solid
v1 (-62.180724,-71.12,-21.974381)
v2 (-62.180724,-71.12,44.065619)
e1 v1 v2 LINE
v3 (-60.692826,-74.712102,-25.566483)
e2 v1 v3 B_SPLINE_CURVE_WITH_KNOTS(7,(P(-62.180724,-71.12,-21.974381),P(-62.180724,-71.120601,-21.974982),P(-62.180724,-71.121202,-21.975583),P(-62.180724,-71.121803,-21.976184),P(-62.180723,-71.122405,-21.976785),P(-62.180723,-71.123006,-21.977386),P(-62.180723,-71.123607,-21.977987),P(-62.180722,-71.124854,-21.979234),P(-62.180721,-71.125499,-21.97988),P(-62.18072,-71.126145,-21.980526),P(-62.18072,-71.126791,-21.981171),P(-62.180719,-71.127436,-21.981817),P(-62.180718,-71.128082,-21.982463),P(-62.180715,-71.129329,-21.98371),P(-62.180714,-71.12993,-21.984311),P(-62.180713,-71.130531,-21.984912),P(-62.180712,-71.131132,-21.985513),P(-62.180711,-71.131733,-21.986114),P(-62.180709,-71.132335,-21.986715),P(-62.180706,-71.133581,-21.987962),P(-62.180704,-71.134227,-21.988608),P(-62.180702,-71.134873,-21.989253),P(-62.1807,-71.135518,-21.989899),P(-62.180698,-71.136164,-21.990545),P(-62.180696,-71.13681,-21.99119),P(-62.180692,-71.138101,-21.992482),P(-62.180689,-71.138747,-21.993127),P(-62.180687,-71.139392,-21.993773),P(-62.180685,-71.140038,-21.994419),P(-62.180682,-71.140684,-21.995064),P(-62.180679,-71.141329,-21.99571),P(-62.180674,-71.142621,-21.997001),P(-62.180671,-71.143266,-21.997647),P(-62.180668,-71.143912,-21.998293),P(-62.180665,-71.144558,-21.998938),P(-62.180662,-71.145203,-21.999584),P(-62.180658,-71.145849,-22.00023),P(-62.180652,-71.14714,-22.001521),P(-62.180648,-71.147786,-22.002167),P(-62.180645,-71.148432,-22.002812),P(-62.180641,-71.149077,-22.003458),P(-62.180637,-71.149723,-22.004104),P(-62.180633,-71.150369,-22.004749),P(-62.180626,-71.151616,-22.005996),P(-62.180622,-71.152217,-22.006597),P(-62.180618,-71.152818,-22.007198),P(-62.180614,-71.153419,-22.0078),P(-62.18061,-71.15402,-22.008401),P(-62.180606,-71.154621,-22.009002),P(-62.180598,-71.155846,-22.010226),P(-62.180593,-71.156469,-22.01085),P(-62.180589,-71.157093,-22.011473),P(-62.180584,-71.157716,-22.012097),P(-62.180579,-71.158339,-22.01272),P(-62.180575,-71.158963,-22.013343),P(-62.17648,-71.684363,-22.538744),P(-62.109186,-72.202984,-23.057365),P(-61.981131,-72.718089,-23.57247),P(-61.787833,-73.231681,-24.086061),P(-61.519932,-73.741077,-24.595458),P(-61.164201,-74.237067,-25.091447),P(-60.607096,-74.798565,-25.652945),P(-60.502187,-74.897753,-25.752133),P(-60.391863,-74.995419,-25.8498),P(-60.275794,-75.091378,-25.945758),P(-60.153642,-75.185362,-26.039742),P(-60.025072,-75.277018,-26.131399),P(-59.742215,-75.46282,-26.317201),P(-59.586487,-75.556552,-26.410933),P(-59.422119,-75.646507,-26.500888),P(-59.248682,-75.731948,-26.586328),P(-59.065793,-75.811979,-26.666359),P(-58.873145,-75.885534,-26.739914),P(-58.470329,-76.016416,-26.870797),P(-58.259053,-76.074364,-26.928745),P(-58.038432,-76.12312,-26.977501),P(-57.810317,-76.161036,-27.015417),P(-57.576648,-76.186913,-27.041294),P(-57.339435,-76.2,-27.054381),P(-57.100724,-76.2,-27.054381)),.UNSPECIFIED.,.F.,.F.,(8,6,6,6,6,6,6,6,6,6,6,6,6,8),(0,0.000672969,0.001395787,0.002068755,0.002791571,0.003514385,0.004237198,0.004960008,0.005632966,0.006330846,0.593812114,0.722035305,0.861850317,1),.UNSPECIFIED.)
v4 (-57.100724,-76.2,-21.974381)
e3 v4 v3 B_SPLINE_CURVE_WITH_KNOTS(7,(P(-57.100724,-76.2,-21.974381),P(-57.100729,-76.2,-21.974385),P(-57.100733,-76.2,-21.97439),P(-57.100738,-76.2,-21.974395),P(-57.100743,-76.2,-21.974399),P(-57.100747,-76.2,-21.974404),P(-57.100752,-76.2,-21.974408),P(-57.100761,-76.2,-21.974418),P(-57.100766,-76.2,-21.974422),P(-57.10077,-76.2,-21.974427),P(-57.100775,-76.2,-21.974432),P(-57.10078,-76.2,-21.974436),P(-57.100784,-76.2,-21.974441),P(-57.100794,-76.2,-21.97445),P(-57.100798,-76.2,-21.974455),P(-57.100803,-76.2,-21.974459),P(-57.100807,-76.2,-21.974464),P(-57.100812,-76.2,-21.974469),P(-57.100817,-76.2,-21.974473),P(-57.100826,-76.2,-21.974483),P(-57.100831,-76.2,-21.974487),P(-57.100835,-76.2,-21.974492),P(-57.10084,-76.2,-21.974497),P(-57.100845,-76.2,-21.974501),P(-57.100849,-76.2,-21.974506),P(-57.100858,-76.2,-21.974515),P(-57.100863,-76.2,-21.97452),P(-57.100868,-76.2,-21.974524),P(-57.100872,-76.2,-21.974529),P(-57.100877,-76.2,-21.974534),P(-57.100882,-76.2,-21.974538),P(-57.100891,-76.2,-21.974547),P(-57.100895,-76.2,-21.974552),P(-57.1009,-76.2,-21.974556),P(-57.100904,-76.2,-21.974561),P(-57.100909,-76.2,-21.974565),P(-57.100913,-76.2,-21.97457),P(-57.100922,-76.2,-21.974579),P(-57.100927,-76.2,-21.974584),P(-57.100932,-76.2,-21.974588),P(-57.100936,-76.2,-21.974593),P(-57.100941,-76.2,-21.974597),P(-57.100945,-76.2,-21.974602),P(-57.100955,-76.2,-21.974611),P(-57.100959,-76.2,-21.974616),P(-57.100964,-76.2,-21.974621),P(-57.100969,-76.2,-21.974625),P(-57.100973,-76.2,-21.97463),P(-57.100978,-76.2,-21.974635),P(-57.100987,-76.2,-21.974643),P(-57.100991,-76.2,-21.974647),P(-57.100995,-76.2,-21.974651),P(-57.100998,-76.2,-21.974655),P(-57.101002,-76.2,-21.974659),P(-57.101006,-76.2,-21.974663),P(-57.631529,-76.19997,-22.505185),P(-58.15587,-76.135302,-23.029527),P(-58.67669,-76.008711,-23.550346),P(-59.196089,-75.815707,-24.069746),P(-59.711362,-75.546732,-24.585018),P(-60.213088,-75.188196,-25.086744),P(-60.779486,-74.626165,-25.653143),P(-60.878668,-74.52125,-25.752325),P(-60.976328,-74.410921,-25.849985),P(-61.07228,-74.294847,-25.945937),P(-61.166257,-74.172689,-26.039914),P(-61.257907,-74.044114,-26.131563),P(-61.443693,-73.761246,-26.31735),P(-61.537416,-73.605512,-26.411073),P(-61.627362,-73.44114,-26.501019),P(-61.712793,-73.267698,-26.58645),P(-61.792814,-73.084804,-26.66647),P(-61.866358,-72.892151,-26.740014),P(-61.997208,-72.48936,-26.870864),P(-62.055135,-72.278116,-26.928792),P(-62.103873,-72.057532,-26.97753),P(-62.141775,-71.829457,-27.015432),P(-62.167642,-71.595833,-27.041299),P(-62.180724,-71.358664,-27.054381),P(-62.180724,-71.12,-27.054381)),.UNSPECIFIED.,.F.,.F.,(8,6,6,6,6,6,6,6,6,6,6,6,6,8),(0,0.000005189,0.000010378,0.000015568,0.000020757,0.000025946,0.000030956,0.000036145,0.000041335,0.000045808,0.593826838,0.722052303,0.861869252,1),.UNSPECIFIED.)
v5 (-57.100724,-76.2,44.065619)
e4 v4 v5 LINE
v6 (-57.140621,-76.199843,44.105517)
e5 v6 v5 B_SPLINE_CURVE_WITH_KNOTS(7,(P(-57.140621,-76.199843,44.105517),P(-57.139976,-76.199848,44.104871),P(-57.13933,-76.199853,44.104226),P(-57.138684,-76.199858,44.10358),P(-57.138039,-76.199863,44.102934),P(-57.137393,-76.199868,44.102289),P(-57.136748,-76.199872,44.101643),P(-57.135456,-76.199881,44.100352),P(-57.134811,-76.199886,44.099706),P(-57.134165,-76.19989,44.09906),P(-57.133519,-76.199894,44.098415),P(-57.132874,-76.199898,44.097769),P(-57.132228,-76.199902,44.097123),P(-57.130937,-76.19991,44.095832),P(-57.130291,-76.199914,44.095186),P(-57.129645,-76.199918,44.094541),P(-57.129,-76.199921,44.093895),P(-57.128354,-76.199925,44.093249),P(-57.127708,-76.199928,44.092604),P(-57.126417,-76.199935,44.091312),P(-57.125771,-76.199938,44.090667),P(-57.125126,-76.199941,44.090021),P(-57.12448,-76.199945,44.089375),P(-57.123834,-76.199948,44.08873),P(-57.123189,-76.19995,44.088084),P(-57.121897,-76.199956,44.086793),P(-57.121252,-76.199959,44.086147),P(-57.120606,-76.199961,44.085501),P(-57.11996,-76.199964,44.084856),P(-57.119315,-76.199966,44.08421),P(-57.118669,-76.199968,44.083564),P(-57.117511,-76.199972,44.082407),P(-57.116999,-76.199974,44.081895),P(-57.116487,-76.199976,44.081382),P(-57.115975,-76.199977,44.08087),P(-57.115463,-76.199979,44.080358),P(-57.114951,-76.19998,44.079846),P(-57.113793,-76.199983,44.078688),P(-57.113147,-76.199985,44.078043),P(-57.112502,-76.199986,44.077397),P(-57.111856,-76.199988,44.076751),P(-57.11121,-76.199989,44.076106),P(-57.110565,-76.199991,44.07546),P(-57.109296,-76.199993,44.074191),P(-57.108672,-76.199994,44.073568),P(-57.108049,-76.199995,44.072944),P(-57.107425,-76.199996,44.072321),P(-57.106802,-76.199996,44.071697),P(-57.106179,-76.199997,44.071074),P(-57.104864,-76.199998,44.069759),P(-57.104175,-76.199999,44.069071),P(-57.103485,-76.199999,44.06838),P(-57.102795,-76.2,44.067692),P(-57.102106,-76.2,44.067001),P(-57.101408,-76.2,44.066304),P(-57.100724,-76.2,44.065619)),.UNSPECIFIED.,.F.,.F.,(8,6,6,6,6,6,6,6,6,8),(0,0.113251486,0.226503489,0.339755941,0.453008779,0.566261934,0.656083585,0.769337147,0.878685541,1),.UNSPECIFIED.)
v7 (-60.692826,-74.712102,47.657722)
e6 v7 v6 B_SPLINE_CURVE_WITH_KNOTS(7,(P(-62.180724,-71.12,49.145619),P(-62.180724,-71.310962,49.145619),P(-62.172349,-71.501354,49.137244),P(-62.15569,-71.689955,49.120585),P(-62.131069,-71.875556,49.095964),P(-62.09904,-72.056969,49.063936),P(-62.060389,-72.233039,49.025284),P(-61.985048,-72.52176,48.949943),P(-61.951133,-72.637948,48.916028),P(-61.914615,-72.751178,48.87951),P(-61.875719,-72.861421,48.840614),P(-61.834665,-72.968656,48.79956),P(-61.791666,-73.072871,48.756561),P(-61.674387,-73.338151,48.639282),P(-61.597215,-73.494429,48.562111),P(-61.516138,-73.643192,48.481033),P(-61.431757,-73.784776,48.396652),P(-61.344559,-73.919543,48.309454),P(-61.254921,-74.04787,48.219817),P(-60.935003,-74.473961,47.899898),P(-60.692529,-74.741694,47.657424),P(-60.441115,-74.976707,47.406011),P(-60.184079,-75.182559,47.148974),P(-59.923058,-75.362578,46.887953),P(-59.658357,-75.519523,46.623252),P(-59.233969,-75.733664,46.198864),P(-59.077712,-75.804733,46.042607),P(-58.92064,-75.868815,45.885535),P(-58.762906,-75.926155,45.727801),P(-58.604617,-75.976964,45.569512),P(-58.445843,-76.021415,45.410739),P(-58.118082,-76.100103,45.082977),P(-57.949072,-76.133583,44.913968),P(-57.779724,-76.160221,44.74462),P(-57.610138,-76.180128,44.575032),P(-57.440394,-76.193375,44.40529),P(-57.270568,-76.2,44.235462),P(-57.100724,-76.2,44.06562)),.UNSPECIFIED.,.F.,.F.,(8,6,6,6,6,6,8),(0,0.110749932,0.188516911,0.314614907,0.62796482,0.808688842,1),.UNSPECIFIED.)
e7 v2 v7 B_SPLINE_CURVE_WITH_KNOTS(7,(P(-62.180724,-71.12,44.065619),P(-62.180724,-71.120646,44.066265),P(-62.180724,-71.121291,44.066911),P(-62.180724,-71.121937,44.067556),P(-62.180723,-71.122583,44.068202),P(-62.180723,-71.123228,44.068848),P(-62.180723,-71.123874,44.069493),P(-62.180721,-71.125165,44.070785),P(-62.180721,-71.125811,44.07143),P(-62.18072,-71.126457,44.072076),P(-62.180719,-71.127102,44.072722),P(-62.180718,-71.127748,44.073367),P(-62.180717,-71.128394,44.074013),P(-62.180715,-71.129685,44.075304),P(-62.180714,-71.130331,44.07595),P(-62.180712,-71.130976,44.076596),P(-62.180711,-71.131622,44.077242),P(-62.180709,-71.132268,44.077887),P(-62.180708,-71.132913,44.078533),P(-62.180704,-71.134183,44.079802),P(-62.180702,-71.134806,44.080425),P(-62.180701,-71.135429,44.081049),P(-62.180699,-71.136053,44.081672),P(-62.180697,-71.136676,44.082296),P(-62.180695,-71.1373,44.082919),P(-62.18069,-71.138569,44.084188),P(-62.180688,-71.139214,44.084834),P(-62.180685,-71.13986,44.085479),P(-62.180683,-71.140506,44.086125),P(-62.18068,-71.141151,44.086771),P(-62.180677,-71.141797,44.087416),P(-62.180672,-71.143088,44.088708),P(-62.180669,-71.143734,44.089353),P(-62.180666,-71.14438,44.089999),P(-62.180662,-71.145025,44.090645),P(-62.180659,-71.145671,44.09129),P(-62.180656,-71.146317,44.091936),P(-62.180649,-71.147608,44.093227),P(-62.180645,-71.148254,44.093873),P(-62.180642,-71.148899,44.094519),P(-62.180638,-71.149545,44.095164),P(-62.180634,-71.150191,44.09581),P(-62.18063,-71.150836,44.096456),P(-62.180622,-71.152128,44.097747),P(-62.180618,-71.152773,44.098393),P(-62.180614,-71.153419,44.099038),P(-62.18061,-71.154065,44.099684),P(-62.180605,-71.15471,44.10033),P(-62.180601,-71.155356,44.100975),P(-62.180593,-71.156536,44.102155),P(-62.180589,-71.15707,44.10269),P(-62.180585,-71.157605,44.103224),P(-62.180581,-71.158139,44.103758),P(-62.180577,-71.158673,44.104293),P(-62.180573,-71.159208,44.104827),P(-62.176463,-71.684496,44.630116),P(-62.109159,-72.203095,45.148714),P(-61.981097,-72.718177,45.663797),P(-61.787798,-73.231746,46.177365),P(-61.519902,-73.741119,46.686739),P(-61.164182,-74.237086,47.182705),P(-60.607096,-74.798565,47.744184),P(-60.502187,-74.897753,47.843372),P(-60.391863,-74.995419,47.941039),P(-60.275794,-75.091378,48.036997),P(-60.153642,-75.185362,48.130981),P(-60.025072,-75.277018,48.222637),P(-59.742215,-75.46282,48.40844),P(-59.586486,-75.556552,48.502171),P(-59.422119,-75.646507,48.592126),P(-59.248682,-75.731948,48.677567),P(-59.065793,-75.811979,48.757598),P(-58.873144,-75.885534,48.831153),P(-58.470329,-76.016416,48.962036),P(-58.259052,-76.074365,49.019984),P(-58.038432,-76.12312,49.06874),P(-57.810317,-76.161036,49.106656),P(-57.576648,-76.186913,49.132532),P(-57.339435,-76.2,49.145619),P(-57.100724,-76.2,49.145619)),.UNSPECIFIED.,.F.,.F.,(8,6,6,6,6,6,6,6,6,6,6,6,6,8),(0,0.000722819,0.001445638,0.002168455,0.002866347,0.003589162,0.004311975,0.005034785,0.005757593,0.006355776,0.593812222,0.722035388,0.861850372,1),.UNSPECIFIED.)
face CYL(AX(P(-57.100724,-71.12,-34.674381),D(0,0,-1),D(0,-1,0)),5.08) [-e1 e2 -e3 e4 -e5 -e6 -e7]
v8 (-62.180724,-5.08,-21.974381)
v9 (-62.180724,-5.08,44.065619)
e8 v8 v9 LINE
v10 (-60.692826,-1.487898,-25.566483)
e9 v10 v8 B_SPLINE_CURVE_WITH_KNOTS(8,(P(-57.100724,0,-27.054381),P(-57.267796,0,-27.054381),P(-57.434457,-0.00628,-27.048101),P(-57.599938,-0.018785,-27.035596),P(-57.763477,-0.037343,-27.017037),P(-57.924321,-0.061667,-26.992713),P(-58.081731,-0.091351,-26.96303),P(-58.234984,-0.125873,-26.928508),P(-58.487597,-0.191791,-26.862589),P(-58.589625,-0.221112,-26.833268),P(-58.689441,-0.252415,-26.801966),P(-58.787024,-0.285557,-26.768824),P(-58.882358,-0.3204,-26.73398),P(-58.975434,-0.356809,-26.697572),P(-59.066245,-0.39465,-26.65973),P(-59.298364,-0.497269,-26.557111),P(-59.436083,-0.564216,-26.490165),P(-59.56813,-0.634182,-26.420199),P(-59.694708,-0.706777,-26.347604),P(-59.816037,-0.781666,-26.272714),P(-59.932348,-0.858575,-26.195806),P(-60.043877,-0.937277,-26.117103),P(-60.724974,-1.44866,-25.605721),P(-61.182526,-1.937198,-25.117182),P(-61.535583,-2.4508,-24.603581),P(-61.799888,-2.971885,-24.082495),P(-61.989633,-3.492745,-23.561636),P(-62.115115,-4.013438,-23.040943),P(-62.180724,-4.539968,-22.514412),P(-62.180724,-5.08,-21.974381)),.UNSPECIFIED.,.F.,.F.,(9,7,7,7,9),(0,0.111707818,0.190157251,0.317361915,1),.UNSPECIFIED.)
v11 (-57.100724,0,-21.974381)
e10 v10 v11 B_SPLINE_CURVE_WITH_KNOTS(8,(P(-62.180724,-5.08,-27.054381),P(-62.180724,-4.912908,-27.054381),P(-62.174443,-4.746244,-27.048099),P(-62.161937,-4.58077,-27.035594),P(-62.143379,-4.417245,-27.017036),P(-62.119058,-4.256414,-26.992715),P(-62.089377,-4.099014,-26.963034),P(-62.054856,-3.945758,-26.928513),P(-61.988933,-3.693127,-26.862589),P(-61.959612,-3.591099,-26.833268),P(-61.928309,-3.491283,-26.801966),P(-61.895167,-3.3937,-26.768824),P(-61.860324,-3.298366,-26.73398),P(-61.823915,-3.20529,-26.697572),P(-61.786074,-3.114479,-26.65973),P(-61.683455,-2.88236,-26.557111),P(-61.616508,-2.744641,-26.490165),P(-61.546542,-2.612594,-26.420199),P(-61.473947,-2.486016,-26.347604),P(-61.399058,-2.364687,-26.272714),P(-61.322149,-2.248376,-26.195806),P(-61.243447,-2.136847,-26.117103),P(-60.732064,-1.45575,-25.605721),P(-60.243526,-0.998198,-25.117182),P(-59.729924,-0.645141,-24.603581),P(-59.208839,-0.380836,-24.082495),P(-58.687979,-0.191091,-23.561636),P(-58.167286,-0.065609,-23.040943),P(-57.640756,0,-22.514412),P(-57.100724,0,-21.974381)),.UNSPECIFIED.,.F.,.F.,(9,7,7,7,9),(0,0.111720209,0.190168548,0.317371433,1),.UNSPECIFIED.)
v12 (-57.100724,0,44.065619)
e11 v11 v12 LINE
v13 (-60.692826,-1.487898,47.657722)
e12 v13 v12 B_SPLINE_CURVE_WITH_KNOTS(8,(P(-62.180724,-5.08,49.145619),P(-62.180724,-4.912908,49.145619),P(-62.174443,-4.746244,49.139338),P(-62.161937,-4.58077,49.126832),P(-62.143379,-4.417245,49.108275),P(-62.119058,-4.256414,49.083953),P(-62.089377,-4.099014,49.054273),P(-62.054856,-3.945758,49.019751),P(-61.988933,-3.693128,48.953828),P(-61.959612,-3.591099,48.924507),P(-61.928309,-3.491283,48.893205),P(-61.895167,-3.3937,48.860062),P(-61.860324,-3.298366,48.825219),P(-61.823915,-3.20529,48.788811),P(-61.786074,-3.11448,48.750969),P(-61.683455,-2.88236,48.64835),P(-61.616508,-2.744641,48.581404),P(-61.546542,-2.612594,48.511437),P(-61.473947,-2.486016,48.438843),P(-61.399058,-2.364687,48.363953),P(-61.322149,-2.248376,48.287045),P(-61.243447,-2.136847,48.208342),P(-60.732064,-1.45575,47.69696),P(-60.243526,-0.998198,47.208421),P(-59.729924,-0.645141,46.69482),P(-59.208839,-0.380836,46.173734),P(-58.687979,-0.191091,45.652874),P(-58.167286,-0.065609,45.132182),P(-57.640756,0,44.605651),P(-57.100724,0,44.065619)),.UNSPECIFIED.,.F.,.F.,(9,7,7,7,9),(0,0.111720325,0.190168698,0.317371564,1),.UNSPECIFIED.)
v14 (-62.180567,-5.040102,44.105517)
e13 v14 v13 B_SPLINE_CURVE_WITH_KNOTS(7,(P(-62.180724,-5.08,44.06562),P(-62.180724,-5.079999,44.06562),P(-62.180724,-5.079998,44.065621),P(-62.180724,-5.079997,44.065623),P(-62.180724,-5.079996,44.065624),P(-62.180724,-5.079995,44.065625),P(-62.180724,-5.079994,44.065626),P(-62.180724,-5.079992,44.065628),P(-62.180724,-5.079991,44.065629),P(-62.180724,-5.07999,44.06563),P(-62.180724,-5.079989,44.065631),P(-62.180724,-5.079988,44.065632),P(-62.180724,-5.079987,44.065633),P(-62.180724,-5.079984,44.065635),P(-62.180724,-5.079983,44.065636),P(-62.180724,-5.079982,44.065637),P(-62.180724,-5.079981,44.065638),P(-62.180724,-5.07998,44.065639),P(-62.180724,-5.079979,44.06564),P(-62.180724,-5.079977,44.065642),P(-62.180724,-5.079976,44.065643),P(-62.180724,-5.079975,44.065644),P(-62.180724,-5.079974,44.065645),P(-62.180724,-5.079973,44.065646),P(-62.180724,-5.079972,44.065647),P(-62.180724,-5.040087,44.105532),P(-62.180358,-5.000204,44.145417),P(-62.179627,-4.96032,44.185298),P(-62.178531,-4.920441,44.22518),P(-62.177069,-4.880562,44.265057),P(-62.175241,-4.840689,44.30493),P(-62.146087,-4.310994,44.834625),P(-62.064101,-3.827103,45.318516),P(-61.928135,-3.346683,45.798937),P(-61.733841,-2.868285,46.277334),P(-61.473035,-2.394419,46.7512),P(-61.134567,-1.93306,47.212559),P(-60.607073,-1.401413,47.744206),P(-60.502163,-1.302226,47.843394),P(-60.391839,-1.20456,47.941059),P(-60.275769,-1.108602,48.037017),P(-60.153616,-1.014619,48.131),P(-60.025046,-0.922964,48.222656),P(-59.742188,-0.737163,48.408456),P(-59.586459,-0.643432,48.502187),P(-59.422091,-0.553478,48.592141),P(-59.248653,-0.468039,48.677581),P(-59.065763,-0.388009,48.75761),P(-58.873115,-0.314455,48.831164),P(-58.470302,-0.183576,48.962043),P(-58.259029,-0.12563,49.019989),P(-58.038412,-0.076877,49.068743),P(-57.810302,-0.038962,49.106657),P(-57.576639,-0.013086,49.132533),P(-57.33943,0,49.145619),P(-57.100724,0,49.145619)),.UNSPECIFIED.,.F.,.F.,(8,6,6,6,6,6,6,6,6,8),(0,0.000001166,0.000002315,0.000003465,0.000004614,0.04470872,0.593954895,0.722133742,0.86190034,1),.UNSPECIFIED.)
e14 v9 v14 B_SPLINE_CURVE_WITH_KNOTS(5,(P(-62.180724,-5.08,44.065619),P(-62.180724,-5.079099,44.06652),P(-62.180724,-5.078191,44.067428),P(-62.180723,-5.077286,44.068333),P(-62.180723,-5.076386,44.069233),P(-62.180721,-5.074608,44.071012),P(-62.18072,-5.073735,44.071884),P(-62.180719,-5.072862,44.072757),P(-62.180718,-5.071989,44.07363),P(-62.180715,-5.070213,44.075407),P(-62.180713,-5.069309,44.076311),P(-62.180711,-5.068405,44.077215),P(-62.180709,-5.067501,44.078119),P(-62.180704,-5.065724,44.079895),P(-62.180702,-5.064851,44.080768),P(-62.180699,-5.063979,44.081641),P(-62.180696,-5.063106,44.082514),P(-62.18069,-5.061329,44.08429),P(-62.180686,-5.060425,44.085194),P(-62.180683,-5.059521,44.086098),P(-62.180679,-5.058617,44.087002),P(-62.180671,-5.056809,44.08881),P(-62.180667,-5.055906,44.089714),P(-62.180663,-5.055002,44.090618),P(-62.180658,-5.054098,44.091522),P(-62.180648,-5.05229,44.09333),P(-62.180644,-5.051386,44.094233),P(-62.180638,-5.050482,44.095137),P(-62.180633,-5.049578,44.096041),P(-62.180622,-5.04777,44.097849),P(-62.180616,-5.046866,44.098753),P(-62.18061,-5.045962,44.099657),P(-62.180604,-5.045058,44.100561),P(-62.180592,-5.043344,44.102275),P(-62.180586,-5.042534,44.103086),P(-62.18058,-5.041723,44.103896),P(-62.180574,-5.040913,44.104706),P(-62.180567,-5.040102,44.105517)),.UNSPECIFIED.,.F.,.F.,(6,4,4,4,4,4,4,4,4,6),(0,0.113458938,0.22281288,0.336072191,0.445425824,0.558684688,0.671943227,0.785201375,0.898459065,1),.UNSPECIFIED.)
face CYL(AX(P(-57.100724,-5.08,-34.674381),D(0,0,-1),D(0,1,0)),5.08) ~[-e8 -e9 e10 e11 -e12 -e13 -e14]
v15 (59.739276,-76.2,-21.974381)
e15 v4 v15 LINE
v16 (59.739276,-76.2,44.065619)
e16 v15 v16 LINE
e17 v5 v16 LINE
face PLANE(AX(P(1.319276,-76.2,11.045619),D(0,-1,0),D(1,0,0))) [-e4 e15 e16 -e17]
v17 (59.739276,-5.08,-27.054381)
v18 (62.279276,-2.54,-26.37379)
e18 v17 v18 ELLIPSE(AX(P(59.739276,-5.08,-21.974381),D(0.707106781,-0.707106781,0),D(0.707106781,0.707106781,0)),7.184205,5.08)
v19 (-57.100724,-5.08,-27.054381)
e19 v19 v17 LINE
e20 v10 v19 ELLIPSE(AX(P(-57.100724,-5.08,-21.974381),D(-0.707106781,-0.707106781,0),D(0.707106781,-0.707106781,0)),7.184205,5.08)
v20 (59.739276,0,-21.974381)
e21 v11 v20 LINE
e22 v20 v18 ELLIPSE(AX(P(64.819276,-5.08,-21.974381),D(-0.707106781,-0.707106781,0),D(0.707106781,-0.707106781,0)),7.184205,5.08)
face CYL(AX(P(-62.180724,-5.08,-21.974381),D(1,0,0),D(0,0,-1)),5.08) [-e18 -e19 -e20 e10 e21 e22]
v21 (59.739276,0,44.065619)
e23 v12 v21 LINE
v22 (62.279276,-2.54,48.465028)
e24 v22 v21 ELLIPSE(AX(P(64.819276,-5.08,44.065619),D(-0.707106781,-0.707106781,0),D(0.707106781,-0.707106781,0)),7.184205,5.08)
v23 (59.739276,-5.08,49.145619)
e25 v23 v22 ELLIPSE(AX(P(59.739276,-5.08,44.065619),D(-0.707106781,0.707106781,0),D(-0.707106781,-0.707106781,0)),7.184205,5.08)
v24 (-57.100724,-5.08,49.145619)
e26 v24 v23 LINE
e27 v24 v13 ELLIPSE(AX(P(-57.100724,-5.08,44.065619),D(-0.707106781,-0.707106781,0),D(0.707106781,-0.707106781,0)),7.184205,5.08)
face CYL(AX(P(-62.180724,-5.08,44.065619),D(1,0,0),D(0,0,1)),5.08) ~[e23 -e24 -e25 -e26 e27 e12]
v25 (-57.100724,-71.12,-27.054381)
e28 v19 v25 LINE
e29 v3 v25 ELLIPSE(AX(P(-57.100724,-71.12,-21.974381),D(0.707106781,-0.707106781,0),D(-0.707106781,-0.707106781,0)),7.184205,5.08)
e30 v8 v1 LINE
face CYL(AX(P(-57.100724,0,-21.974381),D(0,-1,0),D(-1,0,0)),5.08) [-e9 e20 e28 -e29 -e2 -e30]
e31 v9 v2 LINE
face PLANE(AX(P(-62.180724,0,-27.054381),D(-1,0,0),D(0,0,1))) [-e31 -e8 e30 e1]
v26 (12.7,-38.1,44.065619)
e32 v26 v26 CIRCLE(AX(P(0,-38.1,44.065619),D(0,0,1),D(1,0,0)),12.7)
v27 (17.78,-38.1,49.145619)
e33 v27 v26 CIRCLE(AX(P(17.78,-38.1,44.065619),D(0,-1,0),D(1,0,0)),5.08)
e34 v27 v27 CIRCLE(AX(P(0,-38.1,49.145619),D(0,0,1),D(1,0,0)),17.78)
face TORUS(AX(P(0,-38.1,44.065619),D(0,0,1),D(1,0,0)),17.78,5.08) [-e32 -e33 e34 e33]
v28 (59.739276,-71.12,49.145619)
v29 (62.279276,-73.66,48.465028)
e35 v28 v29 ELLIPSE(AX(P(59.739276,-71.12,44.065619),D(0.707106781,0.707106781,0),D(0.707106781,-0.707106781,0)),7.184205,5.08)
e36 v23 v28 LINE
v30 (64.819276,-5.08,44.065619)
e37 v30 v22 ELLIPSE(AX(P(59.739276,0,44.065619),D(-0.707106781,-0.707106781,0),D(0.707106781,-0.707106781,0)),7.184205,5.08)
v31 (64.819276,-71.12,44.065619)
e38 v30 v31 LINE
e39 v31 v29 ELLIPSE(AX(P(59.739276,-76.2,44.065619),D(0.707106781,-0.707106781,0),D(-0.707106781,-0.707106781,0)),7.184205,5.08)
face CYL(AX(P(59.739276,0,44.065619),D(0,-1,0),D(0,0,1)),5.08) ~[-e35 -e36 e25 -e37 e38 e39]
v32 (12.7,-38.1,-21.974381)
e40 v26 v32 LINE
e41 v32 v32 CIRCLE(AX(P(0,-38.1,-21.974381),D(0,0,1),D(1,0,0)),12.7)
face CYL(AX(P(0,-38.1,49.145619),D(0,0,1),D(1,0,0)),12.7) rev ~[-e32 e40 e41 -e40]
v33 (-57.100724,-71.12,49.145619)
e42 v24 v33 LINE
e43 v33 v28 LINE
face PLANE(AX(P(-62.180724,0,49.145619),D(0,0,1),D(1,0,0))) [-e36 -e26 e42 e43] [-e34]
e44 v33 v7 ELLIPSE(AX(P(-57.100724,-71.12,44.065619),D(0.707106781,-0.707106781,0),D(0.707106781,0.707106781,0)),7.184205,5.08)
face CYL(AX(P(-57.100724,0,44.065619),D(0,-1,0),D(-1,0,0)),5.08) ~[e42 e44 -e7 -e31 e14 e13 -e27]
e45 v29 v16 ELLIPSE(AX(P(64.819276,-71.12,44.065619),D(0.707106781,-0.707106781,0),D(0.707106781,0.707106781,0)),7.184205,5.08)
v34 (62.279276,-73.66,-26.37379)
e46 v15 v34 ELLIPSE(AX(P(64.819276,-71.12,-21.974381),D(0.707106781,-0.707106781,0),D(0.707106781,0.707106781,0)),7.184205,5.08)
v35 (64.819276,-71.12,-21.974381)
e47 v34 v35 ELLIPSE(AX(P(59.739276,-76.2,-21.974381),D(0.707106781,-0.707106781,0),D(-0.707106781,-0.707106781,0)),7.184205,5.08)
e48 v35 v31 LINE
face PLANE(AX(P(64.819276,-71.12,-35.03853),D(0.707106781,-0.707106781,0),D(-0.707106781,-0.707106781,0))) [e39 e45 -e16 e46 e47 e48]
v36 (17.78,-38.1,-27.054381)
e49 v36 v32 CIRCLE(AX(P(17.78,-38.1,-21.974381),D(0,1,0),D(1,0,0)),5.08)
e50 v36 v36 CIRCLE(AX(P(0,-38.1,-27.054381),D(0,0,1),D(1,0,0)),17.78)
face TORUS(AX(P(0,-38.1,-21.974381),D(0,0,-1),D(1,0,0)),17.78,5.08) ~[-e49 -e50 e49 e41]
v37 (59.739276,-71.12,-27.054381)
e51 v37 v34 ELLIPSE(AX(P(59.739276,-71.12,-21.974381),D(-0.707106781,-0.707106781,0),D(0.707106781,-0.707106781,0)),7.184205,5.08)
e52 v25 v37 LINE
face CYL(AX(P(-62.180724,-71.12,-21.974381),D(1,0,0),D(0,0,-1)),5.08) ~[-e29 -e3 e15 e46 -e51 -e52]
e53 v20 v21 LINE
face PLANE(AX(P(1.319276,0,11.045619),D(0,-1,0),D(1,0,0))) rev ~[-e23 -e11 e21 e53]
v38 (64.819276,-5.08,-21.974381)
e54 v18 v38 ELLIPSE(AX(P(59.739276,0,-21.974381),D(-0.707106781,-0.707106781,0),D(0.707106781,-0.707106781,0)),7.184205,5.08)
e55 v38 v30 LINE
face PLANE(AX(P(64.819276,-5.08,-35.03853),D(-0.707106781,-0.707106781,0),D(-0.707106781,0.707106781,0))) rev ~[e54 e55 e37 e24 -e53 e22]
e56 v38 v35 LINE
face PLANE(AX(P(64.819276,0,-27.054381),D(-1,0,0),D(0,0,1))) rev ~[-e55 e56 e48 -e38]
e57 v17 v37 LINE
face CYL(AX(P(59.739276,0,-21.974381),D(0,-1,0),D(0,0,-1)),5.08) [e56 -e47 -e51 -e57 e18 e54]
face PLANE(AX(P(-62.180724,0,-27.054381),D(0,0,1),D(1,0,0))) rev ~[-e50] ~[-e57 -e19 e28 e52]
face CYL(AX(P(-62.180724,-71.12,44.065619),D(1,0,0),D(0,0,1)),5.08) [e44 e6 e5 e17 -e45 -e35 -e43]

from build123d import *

# Parameters (mm, degrees)
F0_W        = 127
F0_H        = 76.2
F1_DEPTH    = 76.2
F2_R        = 12.7
F3_DEPTH    = 76.201
F4_R        = 5.08
F5_T1_DEPTH = 91.44
F6_T1_DEPTH = 92.1682991577


# Not quite as in the source:
# - a fillet or chamfer that OpenCascade refuses, or shapes differently, is made with other operations: its cross-section is extruded or revolved along the edge and cut away or added


with BuildPart() as f1:
    # F0 (on Front) → F1 (new body)
    with BuildSketch(Plane.XZ):
        with Locations((1.319276005, 11.0456193745)):
            Rectangle(F0_W, F0_H)
    extrude(amount=F1_DEPTH)

    # F2 (on face) → F3 (cut, through all)
    with BuildSketch(Plane.XY.offset(49.1456193745)):
        with Locations((0, -38.1)):
            Circle(F2_R)
    extrude(amount=-F3_DEPTH, mode=Mode.SUBTRACT)

    # F4
    f4_edges = [f1.edges().sort_by_distance(p)[0] for p in [
        (64.819276, -38.1, 49.145619),
        (1.319276, 0, 49.145619),
        (1.319276, -76.2, 49.145619),
        (-62.180724, -38.1, 49.145619),
        (-12.7, -38.1, 49.145619),
        (-62.180724, -38.1, -27.054381),
        (1.319276, 0, -27.054381),
        (1.319276, -76.2, -27.054381),
        (64.819276, -38.1, -27.054381),
        (-12.7, -38.1, -27.054381),
    ]]
    fillet(f4_edges, radius=F4_R)

    # F5: fillet of radius 5.08 on 4 edges, made by hand

    # F5_s2 → F5_t1 (cut)
    with BuildSketch(Plane.XY.offset(-34.6743806255)):
        with BuildLine():
            ThreePointArc((-57.100723995, 0), (-60.6928264434, -1.4878975516), (-62.180723995, -5.08))
            Line((-62.180723995, -5.08), (-62.180723995, 0))
            Line((-62.180723995, 0), (-57.100723995, 0))
        make_face()
        with BuildLine():
            ThreePointArc((-57.100723995, -76.2), (-60.6928264434, -74.7121024484), (-62.180723995, -71.12))
            Line((-62.180723995, -71.12), (-62.180723995, -76.2))
            Line((-62.180723995, -76.2), (-57.100723995, -76.2))
        make_face()
    extrude(amount=F5_T1_DEPTH, mode=Mode.SUBTRACT)

    # F6: chamfer of 5.08 on 4 edges, made by hand

    # F6_s2 → F6_t1 (cut)
    with BuildSketch(Plane.XY.offset(-35.0385302044)):
        Polygon((64.819276005, -5.08), (59.739276005, 0), (64.819276005, 0), align=None)
        Polygon((64.819276005, -71.12), (59.739276005, -76.2), (64.819276005, -76.2), align=None)
    extrude(amount=F6_T1_DEPTH, mode=Mode.SUBTRACT)


solid = f1.part
